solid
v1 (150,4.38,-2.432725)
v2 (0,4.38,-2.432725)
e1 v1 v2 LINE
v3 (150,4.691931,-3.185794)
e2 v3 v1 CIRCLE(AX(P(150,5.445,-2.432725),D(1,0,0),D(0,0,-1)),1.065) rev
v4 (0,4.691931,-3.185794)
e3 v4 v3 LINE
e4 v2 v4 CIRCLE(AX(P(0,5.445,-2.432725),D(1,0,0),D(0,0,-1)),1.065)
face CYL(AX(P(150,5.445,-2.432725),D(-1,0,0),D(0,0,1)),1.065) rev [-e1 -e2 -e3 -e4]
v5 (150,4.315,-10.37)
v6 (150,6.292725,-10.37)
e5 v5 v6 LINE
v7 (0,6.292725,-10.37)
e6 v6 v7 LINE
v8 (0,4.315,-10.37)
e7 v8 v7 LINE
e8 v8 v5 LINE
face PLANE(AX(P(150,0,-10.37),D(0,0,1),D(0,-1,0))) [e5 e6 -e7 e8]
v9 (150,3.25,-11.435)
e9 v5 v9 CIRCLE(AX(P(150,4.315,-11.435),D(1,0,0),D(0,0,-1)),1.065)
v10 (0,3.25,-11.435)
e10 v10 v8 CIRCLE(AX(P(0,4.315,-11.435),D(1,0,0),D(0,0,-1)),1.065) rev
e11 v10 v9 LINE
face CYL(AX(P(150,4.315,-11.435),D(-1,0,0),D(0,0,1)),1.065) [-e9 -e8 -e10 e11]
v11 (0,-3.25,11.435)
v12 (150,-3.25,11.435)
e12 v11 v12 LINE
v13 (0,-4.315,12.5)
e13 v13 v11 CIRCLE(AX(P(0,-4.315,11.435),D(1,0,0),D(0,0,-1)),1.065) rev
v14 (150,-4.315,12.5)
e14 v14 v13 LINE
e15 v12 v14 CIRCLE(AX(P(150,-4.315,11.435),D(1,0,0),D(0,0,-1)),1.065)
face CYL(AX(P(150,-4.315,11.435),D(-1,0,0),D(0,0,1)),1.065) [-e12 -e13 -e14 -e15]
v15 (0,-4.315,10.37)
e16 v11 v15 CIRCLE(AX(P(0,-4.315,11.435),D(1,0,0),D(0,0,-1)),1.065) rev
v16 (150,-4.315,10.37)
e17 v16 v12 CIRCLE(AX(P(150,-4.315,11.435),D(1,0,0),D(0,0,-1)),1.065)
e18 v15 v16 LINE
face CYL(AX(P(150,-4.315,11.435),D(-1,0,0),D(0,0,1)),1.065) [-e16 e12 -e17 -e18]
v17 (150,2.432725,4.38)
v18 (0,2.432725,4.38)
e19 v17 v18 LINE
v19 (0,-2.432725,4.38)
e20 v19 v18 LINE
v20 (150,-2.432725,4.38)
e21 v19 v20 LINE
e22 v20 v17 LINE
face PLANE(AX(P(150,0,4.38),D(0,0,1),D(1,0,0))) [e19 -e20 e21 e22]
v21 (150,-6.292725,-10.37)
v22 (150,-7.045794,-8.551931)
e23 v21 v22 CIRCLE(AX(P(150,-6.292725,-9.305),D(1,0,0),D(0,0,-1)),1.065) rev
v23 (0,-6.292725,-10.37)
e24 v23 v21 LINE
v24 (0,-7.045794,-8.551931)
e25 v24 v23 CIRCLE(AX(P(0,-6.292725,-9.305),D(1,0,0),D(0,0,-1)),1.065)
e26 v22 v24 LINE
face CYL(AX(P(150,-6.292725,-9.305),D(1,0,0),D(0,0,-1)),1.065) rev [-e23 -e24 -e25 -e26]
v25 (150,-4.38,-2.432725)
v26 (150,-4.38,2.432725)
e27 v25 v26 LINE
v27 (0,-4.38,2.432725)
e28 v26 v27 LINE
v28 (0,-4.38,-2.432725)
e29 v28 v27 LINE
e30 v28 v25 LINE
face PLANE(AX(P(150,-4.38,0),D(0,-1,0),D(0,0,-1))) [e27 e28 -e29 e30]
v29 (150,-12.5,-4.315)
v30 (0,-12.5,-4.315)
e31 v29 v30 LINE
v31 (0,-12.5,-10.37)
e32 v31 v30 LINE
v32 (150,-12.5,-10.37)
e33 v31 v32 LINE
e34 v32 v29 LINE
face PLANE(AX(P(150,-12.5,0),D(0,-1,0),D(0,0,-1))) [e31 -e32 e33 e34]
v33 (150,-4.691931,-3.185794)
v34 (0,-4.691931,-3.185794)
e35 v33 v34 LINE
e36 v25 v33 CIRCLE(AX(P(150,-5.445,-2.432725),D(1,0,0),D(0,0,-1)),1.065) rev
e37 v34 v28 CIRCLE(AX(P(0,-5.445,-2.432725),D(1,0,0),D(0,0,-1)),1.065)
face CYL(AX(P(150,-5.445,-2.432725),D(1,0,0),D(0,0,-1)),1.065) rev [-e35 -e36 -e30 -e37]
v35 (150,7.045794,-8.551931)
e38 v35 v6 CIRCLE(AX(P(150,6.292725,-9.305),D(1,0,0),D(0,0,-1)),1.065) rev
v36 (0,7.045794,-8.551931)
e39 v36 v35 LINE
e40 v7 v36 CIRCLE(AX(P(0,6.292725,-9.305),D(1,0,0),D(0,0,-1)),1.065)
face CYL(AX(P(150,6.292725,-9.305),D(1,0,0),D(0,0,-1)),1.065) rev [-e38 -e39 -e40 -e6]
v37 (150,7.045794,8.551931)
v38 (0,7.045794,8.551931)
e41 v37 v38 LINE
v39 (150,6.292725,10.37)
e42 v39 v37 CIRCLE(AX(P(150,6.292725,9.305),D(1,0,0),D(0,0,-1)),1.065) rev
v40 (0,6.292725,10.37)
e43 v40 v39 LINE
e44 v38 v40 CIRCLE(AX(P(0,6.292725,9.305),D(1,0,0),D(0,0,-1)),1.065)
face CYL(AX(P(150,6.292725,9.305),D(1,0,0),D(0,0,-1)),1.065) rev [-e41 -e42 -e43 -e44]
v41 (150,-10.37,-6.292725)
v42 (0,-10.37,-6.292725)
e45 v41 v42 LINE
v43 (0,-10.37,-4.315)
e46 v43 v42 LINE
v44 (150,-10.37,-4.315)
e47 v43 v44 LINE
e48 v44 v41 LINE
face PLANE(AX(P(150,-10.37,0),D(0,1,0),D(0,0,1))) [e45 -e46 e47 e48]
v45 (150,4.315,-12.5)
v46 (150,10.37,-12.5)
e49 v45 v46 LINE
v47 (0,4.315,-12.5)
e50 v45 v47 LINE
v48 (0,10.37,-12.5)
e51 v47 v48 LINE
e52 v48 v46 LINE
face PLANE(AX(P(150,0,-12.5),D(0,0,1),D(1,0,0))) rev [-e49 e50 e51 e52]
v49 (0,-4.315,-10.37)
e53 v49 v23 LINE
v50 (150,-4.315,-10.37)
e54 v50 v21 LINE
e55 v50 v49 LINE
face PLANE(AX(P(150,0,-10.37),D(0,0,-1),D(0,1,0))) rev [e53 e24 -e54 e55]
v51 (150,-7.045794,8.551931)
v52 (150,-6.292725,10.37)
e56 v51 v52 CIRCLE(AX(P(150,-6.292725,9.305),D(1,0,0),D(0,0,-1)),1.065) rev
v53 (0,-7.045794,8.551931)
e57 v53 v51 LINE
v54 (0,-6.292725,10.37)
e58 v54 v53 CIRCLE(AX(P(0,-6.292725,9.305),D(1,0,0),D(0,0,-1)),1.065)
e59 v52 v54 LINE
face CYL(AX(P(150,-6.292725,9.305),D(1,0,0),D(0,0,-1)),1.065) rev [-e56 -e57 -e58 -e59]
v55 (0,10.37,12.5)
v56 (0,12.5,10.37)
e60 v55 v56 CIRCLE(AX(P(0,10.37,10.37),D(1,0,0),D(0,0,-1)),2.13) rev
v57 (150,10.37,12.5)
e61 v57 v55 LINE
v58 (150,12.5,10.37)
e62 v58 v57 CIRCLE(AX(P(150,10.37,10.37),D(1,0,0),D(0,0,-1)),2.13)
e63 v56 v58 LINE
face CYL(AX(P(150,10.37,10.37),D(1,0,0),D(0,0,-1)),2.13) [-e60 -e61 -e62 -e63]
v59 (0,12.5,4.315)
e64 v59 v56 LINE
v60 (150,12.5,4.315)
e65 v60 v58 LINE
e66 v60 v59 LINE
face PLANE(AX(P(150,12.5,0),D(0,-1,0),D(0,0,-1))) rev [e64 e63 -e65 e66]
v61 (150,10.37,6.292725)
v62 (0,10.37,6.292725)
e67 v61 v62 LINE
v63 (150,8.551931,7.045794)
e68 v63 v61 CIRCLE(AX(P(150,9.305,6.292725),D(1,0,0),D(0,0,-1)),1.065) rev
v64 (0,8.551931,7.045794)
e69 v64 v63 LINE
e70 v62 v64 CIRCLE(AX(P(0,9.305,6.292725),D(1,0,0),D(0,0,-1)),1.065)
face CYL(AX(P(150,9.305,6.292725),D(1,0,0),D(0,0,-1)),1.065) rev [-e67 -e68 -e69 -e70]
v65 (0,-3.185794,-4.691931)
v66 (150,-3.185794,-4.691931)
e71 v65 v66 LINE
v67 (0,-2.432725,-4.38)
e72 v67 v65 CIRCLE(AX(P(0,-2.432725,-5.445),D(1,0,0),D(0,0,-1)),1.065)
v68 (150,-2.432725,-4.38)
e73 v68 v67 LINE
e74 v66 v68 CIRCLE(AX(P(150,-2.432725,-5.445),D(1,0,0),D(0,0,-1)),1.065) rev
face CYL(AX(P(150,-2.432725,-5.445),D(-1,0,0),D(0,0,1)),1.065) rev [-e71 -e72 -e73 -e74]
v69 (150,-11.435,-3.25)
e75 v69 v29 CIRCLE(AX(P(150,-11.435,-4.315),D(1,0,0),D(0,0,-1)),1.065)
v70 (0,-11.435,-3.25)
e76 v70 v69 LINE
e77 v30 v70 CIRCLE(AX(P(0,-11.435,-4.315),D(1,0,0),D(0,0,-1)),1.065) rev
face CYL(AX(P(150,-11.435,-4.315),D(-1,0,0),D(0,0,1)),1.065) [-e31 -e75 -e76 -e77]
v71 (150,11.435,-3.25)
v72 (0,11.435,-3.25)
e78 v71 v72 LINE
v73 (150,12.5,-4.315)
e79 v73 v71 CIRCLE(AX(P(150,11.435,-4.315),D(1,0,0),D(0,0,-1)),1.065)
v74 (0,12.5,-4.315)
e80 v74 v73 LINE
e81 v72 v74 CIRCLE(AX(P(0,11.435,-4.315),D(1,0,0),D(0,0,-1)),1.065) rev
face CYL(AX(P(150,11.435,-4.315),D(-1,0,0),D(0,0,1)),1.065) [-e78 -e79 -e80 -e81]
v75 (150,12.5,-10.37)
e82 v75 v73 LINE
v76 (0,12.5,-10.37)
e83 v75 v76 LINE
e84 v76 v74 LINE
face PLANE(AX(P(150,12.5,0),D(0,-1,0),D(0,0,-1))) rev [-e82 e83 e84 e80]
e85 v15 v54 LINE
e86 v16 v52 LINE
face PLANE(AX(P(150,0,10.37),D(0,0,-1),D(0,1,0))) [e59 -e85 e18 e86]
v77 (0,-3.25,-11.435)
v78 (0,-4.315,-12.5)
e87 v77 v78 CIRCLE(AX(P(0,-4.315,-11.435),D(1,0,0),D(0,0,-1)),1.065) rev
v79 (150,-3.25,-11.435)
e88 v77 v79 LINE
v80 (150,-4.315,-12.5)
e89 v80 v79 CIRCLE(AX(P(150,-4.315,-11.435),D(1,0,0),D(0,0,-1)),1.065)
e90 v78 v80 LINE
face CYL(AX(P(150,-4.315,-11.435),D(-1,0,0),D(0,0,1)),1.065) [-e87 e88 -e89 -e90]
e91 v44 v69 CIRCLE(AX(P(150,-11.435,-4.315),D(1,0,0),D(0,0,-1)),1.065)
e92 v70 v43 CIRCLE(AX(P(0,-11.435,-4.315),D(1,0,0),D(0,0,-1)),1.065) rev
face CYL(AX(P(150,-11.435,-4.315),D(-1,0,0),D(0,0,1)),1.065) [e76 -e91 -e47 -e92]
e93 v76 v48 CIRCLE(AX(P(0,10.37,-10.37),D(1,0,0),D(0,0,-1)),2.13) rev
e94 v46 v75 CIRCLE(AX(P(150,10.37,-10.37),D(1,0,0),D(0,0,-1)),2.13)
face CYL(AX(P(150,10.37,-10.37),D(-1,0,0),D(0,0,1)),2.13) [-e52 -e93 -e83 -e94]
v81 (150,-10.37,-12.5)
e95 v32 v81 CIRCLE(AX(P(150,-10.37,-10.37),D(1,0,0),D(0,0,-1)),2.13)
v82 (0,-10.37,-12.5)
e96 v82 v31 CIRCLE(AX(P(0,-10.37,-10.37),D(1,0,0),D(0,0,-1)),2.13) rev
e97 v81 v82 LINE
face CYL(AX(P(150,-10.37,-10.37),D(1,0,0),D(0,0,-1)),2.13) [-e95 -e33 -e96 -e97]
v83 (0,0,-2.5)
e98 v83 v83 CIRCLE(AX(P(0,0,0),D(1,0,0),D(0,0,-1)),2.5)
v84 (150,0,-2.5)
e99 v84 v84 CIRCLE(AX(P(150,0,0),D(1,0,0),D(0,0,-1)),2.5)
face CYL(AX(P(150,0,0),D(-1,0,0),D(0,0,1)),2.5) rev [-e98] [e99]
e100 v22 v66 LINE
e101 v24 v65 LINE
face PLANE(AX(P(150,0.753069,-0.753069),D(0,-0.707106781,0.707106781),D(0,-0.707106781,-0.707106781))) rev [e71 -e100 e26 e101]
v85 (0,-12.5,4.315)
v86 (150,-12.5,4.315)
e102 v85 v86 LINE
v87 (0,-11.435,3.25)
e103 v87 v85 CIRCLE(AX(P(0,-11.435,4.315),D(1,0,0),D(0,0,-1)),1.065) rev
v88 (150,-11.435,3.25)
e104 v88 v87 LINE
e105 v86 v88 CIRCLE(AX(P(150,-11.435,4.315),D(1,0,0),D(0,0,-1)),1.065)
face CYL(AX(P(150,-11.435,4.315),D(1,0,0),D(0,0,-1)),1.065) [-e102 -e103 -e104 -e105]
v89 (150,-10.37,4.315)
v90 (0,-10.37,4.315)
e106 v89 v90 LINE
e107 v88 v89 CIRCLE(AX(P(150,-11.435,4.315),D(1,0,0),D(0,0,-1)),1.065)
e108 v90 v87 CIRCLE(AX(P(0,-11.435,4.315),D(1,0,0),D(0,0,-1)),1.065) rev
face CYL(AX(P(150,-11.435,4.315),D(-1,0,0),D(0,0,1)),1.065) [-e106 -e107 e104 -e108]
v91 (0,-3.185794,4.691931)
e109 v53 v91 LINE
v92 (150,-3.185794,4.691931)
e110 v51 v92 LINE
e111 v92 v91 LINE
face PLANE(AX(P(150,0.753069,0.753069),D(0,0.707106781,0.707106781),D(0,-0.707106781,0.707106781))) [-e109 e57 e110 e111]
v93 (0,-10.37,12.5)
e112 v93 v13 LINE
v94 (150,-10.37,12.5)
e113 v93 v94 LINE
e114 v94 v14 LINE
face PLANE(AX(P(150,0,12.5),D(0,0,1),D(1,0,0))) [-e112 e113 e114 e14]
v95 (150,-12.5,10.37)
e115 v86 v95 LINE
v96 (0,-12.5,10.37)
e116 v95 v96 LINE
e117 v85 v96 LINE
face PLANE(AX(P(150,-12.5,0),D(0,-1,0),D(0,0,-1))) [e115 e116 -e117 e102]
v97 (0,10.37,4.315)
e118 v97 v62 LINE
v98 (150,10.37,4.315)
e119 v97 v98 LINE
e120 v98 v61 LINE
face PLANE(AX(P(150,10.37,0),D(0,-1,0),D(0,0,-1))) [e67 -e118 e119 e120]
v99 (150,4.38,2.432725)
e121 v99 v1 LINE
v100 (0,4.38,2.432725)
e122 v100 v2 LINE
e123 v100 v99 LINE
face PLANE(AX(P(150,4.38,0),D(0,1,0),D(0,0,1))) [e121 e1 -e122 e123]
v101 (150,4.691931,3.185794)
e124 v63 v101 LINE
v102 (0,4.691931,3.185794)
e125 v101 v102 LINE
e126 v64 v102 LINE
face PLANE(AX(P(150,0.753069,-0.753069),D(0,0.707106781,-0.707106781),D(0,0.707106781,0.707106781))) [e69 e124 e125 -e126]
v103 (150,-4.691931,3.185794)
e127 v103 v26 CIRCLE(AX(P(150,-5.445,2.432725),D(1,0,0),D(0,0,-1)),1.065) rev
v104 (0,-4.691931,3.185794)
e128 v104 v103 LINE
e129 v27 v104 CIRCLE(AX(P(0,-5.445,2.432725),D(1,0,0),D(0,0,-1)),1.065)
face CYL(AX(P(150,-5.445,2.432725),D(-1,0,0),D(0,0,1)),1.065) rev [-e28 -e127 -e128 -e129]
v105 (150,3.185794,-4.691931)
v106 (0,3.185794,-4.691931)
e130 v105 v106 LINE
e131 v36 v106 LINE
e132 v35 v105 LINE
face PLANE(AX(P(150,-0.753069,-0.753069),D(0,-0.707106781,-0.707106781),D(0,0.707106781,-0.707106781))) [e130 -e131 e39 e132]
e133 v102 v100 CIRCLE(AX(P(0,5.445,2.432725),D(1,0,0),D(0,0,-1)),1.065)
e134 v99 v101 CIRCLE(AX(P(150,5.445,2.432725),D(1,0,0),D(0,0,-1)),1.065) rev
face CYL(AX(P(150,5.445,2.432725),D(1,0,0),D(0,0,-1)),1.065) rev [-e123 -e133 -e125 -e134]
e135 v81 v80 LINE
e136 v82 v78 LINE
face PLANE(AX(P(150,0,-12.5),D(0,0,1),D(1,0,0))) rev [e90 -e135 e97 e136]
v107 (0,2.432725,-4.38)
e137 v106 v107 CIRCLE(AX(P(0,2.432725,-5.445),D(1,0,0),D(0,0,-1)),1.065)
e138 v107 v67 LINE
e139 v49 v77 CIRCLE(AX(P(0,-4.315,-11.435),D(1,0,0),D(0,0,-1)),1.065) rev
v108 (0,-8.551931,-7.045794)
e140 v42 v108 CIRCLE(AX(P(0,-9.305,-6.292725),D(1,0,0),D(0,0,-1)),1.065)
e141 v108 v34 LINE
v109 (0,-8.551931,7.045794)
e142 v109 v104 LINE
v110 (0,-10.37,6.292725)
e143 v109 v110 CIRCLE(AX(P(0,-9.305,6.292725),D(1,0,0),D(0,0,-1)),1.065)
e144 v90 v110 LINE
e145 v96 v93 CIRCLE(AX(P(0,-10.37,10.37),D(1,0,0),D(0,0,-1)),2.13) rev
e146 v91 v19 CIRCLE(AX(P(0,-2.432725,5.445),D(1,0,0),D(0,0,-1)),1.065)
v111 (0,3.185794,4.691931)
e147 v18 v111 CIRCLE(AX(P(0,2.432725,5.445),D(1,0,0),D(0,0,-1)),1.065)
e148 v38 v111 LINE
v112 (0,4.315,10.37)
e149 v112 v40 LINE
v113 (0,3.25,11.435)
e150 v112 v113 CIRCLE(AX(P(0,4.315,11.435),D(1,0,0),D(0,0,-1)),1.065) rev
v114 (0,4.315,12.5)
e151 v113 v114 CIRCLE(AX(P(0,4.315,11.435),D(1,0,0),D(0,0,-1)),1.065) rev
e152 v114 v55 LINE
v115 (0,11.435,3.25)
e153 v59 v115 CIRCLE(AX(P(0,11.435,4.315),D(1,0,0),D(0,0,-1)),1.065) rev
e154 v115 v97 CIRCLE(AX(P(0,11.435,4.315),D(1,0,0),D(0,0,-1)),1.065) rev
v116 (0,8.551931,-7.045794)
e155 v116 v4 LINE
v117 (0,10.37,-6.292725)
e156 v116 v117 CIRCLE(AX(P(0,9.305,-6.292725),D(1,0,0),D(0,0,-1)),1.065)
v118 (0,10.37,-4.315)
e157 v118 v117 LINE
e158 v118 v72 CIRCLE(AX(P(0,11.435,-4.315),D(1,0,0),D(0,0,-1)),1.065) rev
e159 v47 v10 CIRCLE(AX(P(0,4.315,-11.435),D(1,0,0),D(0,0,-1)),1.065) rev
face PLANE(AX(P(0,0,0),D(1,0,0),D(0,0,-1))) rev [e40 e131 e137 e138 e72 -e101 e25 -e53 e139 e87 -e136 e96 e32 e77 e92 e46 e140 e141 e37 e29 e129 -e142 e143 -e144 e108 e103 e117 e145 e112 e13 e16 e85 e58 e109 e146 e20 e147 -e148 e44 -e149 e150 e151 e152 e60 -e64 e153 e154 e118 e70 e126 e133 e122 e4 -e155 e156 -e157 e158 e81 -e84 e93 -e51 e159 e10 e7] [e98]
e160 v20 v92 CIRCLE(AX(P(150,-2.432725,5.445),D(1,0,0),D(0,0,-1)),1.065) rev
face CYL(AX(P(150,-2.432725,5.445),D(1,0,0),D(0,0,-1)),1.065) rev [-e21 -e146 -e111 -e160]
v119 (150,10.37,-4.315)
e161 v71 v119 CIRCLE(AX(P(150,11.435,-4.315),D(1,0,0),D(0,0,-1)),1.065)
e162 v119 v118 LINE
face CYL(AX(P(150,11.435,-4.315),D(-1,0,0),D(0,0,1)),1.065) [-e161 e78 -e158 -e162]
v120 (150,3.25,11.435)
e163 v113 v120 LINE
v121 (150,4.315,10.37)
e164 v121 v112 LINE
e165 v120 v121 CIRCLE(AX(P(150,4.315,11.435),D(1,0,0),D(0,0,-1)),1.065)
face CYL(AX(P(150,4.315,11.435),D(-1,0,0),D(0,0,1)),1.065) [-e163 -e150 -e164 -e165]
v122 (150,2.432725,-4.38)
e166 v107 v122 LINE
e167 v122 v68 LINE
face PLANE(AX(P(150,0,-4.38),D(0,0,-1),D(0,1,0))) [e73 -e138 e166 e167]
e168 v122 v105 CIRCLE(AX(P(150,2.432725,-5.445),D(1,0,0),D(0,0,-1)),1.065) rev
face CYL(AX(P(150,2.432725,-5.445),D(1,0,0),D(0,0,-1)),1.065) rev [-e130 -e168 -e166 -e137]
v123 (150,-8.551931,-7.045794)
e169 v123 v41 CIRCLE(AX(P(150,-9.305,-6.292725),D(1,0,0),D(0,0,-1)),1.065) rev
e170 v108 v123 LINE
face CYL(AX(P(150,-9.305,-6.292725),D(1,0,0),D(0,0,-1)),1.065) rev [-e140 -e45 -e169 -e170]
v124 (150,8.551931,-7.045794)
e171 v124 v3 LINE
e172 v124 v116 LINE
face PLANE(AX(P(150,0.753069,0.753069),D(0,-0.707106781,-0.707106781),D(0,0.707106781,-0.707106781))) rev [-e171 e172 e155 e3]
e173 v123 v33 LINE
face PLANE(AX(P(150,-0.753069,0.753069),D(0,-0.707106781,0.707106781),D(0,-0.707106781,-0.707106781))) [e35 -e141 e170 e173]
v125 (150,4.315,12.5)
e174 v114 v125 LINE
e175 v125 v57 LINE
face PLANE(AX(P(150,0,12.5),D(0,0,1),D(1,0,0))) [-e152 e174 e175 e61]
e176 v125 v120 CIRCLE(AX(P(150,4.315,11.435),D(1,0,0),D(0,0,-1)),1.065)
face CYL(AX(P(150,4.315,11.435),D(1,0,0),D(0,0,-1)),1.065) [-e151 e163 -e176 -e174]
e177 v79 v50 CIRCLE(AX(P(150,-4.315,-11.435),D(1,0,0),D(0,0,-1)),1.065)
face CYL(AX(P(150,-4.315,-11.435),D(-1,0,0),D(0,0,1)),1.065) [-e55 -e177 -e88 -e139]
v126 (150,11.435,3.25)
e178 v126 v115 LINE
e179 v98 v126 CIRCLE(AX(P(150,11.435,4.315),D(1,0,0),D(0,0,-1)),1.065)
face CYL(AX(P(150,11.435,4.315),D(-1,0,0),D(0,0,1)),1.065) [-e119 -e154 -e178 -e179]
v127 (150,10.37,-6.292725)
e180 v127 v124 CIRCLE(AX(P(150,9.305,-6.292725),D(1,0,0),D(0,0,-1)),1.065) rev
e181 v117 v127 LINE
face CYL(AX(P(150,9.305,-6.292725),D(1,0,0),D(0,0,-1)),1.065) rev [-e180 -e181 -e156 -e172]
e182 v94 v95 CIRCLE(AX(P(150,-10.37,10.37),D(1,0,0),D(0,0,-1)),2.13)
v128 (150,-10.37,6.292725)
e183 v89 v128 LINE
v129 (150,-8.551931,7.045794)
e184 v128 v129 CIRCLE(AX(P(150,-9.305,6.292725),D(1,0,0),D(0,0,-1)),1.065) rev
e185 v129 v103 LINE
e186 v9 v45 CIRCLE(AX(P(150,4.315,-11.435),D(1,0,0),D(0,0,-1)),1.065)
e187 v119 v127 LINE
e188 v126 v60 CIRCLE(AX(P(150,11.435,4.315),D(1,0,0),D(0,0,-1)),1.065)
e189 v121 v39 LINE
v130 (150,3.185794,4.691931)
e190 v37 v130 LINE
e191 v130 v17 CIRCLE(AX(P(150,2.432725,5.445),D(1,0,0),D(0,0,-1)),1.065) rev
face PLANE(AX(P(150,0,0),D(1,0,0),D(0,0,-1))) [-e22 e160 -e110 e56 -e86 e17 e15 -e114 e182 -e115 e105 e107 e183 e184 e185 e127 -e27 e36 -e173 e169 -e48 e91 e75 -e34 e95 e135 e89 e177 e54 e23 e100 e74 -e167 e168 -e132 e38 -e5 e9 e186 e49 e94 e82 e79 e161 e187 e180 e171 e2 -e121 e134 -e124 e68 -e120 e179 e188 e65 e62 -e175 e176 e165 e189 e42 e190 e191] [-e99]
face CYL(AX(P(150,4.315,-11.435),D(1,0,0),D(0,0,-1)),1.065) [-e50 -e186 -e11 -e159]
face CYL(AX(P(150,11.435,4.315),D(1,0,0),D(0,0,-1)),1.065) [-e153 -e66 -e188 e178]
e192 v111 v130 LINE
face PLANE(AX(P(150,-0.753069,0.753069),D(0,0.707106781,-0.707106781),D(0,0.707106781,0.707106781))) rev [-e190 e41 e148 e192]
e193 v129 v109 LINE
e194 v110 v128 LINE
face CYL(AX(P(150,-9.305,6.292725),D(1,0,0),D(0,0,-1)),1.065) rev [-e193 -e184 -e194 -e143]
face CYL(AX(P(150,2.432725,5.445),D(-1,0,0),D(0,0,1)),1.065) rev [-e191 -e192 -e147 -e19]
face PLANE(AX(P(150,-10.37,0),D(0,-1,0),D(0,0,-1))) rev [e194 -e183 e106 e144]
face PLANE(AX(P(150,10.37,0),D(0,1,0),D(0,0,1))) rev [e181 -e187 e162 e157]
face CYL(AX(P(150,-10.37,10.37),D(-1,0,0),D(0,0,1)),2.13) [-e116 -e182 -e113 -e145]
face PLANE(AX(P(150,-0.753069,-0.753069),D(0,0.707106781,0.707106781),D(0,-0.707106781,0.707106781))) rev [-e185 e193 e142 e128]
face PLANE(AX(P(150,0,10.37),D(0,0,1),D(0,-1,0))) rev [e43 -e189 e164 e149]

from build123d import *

# Parameters (mm, degrees)
SKETCH1_R           = 2.5
BOSS_EXTRUDE1_DEPTH = 150
FILLET1_R           = 1.065
FILLET2_R           = 2.13


with BuildPart() as part:
    # Sketch1 → Boss-Extrude1 (new body)
    with BuildSketch(Plane.YZ):
        Polygon((-12.5, -3.25), (-12.5, -12.5), (-3.25, -12.5), (-3.25, -10.37), (-8.863862556, -10.37), (-2.873862556, -4.38), (2.873862556, -4.38), (8.863862556, -10.37), (3.25, -10.37), (3.25, -12.5), (12.5, -12.5), (12.5, -3.25), (10.37, -3.25), (10.37, -8.863862556), (4.38, -2.873862556), (4.38, 2.873862556), (10.37, 8.863862556), (10.37, 3.25), (12.5, 3.25), (12.5, 12.5), (3.25, 12.5), (3.25, 10.37), (8.863862556, 10.37), (2.873862556, 4.38), (-2.873862556, 4.38), (-8.863862556, 10.37), (-3.25, 10.37), (-3.25, 12.5), (-12.5, 12.5), (-12.5, 3.25), (-10.37, 3.25), (-10.37, 8.863862556), (-4.38, 2.873862556), (-4.38, -2.873862556), (-10.37, -8.863862556), (-10.37, -3.25), align=None)
        with Locations(Location((0, 0, 0), (0, 0, 270))):
            Circle(SKETCH1_R, mode=Mode.SUBTRACT)
    extrude(amount=BOSS_EXTRUDE1_DEPTH)

    # Fillet1
    fillet1_edges = [part.edges().sort_by_distance(p)[0] for p in [
        (75, -10.37, -8.863862556),
        (75, 2.873862556, -4.38),
        (75, -2.873862556, -4.38),
        (75, -4.38, 2.873862556),
        (75, -4.38, -2.873862556),
        (75, -2.873862556, 4.38),
        (75, 2.873862556, 4.38),
        (75, 4.38, 2.873862556),
        (75, 4.38, -2.873862556),
        (75, -8.863862556, -10.37),
        (75, 8.863862556, -10.37),
        (75, 10.37, -8.863862556),
        (75, -10.37, 8.863862556),
        (75, -8.863862556, 10.37),
        (75, 10.37, 8.863862556),
        (75, 8.863862556, 10.37),
        (75, 12.5, 3.25),
        (75, -3.25, -12.5),
        (75, -10.37, 3.25),
        (75, 10.37, 3.25),
        (75, -10.37, -3.25),
        (75, -12.5, -3.25),
        (75, -12.5, 3.25),
        (75, 3.25, -10.37),
        (75, -3.25, -10.37),
        (75, 3.25, -12.5),
        (75, 10.37, -3.25),
        (75, 12.5, -3.25),
        (75, 3.25, 12.5),
        (75, 3.25, 10.37),
        (75, -3.25, 10.37),
        (75, -3.25, 12.5),
    ]]
    fillet(fillet1_edges, radius=FILLET1_R - 0.0001)  # a hair under: the kernel refuses the full size

    # Fillet2
    fillet2_edges = [part.edges().sort_by_distance(p)[0] for p in [
        (75, -12.5, 12.5),
        (75, 12.5, 12.5),
        (75, 12.5, -12.5),
        (75, -12.5, -12.5),
    ]]
    fillet(fillet2_edges, radius=FILLET2_R)


solid = part.part
